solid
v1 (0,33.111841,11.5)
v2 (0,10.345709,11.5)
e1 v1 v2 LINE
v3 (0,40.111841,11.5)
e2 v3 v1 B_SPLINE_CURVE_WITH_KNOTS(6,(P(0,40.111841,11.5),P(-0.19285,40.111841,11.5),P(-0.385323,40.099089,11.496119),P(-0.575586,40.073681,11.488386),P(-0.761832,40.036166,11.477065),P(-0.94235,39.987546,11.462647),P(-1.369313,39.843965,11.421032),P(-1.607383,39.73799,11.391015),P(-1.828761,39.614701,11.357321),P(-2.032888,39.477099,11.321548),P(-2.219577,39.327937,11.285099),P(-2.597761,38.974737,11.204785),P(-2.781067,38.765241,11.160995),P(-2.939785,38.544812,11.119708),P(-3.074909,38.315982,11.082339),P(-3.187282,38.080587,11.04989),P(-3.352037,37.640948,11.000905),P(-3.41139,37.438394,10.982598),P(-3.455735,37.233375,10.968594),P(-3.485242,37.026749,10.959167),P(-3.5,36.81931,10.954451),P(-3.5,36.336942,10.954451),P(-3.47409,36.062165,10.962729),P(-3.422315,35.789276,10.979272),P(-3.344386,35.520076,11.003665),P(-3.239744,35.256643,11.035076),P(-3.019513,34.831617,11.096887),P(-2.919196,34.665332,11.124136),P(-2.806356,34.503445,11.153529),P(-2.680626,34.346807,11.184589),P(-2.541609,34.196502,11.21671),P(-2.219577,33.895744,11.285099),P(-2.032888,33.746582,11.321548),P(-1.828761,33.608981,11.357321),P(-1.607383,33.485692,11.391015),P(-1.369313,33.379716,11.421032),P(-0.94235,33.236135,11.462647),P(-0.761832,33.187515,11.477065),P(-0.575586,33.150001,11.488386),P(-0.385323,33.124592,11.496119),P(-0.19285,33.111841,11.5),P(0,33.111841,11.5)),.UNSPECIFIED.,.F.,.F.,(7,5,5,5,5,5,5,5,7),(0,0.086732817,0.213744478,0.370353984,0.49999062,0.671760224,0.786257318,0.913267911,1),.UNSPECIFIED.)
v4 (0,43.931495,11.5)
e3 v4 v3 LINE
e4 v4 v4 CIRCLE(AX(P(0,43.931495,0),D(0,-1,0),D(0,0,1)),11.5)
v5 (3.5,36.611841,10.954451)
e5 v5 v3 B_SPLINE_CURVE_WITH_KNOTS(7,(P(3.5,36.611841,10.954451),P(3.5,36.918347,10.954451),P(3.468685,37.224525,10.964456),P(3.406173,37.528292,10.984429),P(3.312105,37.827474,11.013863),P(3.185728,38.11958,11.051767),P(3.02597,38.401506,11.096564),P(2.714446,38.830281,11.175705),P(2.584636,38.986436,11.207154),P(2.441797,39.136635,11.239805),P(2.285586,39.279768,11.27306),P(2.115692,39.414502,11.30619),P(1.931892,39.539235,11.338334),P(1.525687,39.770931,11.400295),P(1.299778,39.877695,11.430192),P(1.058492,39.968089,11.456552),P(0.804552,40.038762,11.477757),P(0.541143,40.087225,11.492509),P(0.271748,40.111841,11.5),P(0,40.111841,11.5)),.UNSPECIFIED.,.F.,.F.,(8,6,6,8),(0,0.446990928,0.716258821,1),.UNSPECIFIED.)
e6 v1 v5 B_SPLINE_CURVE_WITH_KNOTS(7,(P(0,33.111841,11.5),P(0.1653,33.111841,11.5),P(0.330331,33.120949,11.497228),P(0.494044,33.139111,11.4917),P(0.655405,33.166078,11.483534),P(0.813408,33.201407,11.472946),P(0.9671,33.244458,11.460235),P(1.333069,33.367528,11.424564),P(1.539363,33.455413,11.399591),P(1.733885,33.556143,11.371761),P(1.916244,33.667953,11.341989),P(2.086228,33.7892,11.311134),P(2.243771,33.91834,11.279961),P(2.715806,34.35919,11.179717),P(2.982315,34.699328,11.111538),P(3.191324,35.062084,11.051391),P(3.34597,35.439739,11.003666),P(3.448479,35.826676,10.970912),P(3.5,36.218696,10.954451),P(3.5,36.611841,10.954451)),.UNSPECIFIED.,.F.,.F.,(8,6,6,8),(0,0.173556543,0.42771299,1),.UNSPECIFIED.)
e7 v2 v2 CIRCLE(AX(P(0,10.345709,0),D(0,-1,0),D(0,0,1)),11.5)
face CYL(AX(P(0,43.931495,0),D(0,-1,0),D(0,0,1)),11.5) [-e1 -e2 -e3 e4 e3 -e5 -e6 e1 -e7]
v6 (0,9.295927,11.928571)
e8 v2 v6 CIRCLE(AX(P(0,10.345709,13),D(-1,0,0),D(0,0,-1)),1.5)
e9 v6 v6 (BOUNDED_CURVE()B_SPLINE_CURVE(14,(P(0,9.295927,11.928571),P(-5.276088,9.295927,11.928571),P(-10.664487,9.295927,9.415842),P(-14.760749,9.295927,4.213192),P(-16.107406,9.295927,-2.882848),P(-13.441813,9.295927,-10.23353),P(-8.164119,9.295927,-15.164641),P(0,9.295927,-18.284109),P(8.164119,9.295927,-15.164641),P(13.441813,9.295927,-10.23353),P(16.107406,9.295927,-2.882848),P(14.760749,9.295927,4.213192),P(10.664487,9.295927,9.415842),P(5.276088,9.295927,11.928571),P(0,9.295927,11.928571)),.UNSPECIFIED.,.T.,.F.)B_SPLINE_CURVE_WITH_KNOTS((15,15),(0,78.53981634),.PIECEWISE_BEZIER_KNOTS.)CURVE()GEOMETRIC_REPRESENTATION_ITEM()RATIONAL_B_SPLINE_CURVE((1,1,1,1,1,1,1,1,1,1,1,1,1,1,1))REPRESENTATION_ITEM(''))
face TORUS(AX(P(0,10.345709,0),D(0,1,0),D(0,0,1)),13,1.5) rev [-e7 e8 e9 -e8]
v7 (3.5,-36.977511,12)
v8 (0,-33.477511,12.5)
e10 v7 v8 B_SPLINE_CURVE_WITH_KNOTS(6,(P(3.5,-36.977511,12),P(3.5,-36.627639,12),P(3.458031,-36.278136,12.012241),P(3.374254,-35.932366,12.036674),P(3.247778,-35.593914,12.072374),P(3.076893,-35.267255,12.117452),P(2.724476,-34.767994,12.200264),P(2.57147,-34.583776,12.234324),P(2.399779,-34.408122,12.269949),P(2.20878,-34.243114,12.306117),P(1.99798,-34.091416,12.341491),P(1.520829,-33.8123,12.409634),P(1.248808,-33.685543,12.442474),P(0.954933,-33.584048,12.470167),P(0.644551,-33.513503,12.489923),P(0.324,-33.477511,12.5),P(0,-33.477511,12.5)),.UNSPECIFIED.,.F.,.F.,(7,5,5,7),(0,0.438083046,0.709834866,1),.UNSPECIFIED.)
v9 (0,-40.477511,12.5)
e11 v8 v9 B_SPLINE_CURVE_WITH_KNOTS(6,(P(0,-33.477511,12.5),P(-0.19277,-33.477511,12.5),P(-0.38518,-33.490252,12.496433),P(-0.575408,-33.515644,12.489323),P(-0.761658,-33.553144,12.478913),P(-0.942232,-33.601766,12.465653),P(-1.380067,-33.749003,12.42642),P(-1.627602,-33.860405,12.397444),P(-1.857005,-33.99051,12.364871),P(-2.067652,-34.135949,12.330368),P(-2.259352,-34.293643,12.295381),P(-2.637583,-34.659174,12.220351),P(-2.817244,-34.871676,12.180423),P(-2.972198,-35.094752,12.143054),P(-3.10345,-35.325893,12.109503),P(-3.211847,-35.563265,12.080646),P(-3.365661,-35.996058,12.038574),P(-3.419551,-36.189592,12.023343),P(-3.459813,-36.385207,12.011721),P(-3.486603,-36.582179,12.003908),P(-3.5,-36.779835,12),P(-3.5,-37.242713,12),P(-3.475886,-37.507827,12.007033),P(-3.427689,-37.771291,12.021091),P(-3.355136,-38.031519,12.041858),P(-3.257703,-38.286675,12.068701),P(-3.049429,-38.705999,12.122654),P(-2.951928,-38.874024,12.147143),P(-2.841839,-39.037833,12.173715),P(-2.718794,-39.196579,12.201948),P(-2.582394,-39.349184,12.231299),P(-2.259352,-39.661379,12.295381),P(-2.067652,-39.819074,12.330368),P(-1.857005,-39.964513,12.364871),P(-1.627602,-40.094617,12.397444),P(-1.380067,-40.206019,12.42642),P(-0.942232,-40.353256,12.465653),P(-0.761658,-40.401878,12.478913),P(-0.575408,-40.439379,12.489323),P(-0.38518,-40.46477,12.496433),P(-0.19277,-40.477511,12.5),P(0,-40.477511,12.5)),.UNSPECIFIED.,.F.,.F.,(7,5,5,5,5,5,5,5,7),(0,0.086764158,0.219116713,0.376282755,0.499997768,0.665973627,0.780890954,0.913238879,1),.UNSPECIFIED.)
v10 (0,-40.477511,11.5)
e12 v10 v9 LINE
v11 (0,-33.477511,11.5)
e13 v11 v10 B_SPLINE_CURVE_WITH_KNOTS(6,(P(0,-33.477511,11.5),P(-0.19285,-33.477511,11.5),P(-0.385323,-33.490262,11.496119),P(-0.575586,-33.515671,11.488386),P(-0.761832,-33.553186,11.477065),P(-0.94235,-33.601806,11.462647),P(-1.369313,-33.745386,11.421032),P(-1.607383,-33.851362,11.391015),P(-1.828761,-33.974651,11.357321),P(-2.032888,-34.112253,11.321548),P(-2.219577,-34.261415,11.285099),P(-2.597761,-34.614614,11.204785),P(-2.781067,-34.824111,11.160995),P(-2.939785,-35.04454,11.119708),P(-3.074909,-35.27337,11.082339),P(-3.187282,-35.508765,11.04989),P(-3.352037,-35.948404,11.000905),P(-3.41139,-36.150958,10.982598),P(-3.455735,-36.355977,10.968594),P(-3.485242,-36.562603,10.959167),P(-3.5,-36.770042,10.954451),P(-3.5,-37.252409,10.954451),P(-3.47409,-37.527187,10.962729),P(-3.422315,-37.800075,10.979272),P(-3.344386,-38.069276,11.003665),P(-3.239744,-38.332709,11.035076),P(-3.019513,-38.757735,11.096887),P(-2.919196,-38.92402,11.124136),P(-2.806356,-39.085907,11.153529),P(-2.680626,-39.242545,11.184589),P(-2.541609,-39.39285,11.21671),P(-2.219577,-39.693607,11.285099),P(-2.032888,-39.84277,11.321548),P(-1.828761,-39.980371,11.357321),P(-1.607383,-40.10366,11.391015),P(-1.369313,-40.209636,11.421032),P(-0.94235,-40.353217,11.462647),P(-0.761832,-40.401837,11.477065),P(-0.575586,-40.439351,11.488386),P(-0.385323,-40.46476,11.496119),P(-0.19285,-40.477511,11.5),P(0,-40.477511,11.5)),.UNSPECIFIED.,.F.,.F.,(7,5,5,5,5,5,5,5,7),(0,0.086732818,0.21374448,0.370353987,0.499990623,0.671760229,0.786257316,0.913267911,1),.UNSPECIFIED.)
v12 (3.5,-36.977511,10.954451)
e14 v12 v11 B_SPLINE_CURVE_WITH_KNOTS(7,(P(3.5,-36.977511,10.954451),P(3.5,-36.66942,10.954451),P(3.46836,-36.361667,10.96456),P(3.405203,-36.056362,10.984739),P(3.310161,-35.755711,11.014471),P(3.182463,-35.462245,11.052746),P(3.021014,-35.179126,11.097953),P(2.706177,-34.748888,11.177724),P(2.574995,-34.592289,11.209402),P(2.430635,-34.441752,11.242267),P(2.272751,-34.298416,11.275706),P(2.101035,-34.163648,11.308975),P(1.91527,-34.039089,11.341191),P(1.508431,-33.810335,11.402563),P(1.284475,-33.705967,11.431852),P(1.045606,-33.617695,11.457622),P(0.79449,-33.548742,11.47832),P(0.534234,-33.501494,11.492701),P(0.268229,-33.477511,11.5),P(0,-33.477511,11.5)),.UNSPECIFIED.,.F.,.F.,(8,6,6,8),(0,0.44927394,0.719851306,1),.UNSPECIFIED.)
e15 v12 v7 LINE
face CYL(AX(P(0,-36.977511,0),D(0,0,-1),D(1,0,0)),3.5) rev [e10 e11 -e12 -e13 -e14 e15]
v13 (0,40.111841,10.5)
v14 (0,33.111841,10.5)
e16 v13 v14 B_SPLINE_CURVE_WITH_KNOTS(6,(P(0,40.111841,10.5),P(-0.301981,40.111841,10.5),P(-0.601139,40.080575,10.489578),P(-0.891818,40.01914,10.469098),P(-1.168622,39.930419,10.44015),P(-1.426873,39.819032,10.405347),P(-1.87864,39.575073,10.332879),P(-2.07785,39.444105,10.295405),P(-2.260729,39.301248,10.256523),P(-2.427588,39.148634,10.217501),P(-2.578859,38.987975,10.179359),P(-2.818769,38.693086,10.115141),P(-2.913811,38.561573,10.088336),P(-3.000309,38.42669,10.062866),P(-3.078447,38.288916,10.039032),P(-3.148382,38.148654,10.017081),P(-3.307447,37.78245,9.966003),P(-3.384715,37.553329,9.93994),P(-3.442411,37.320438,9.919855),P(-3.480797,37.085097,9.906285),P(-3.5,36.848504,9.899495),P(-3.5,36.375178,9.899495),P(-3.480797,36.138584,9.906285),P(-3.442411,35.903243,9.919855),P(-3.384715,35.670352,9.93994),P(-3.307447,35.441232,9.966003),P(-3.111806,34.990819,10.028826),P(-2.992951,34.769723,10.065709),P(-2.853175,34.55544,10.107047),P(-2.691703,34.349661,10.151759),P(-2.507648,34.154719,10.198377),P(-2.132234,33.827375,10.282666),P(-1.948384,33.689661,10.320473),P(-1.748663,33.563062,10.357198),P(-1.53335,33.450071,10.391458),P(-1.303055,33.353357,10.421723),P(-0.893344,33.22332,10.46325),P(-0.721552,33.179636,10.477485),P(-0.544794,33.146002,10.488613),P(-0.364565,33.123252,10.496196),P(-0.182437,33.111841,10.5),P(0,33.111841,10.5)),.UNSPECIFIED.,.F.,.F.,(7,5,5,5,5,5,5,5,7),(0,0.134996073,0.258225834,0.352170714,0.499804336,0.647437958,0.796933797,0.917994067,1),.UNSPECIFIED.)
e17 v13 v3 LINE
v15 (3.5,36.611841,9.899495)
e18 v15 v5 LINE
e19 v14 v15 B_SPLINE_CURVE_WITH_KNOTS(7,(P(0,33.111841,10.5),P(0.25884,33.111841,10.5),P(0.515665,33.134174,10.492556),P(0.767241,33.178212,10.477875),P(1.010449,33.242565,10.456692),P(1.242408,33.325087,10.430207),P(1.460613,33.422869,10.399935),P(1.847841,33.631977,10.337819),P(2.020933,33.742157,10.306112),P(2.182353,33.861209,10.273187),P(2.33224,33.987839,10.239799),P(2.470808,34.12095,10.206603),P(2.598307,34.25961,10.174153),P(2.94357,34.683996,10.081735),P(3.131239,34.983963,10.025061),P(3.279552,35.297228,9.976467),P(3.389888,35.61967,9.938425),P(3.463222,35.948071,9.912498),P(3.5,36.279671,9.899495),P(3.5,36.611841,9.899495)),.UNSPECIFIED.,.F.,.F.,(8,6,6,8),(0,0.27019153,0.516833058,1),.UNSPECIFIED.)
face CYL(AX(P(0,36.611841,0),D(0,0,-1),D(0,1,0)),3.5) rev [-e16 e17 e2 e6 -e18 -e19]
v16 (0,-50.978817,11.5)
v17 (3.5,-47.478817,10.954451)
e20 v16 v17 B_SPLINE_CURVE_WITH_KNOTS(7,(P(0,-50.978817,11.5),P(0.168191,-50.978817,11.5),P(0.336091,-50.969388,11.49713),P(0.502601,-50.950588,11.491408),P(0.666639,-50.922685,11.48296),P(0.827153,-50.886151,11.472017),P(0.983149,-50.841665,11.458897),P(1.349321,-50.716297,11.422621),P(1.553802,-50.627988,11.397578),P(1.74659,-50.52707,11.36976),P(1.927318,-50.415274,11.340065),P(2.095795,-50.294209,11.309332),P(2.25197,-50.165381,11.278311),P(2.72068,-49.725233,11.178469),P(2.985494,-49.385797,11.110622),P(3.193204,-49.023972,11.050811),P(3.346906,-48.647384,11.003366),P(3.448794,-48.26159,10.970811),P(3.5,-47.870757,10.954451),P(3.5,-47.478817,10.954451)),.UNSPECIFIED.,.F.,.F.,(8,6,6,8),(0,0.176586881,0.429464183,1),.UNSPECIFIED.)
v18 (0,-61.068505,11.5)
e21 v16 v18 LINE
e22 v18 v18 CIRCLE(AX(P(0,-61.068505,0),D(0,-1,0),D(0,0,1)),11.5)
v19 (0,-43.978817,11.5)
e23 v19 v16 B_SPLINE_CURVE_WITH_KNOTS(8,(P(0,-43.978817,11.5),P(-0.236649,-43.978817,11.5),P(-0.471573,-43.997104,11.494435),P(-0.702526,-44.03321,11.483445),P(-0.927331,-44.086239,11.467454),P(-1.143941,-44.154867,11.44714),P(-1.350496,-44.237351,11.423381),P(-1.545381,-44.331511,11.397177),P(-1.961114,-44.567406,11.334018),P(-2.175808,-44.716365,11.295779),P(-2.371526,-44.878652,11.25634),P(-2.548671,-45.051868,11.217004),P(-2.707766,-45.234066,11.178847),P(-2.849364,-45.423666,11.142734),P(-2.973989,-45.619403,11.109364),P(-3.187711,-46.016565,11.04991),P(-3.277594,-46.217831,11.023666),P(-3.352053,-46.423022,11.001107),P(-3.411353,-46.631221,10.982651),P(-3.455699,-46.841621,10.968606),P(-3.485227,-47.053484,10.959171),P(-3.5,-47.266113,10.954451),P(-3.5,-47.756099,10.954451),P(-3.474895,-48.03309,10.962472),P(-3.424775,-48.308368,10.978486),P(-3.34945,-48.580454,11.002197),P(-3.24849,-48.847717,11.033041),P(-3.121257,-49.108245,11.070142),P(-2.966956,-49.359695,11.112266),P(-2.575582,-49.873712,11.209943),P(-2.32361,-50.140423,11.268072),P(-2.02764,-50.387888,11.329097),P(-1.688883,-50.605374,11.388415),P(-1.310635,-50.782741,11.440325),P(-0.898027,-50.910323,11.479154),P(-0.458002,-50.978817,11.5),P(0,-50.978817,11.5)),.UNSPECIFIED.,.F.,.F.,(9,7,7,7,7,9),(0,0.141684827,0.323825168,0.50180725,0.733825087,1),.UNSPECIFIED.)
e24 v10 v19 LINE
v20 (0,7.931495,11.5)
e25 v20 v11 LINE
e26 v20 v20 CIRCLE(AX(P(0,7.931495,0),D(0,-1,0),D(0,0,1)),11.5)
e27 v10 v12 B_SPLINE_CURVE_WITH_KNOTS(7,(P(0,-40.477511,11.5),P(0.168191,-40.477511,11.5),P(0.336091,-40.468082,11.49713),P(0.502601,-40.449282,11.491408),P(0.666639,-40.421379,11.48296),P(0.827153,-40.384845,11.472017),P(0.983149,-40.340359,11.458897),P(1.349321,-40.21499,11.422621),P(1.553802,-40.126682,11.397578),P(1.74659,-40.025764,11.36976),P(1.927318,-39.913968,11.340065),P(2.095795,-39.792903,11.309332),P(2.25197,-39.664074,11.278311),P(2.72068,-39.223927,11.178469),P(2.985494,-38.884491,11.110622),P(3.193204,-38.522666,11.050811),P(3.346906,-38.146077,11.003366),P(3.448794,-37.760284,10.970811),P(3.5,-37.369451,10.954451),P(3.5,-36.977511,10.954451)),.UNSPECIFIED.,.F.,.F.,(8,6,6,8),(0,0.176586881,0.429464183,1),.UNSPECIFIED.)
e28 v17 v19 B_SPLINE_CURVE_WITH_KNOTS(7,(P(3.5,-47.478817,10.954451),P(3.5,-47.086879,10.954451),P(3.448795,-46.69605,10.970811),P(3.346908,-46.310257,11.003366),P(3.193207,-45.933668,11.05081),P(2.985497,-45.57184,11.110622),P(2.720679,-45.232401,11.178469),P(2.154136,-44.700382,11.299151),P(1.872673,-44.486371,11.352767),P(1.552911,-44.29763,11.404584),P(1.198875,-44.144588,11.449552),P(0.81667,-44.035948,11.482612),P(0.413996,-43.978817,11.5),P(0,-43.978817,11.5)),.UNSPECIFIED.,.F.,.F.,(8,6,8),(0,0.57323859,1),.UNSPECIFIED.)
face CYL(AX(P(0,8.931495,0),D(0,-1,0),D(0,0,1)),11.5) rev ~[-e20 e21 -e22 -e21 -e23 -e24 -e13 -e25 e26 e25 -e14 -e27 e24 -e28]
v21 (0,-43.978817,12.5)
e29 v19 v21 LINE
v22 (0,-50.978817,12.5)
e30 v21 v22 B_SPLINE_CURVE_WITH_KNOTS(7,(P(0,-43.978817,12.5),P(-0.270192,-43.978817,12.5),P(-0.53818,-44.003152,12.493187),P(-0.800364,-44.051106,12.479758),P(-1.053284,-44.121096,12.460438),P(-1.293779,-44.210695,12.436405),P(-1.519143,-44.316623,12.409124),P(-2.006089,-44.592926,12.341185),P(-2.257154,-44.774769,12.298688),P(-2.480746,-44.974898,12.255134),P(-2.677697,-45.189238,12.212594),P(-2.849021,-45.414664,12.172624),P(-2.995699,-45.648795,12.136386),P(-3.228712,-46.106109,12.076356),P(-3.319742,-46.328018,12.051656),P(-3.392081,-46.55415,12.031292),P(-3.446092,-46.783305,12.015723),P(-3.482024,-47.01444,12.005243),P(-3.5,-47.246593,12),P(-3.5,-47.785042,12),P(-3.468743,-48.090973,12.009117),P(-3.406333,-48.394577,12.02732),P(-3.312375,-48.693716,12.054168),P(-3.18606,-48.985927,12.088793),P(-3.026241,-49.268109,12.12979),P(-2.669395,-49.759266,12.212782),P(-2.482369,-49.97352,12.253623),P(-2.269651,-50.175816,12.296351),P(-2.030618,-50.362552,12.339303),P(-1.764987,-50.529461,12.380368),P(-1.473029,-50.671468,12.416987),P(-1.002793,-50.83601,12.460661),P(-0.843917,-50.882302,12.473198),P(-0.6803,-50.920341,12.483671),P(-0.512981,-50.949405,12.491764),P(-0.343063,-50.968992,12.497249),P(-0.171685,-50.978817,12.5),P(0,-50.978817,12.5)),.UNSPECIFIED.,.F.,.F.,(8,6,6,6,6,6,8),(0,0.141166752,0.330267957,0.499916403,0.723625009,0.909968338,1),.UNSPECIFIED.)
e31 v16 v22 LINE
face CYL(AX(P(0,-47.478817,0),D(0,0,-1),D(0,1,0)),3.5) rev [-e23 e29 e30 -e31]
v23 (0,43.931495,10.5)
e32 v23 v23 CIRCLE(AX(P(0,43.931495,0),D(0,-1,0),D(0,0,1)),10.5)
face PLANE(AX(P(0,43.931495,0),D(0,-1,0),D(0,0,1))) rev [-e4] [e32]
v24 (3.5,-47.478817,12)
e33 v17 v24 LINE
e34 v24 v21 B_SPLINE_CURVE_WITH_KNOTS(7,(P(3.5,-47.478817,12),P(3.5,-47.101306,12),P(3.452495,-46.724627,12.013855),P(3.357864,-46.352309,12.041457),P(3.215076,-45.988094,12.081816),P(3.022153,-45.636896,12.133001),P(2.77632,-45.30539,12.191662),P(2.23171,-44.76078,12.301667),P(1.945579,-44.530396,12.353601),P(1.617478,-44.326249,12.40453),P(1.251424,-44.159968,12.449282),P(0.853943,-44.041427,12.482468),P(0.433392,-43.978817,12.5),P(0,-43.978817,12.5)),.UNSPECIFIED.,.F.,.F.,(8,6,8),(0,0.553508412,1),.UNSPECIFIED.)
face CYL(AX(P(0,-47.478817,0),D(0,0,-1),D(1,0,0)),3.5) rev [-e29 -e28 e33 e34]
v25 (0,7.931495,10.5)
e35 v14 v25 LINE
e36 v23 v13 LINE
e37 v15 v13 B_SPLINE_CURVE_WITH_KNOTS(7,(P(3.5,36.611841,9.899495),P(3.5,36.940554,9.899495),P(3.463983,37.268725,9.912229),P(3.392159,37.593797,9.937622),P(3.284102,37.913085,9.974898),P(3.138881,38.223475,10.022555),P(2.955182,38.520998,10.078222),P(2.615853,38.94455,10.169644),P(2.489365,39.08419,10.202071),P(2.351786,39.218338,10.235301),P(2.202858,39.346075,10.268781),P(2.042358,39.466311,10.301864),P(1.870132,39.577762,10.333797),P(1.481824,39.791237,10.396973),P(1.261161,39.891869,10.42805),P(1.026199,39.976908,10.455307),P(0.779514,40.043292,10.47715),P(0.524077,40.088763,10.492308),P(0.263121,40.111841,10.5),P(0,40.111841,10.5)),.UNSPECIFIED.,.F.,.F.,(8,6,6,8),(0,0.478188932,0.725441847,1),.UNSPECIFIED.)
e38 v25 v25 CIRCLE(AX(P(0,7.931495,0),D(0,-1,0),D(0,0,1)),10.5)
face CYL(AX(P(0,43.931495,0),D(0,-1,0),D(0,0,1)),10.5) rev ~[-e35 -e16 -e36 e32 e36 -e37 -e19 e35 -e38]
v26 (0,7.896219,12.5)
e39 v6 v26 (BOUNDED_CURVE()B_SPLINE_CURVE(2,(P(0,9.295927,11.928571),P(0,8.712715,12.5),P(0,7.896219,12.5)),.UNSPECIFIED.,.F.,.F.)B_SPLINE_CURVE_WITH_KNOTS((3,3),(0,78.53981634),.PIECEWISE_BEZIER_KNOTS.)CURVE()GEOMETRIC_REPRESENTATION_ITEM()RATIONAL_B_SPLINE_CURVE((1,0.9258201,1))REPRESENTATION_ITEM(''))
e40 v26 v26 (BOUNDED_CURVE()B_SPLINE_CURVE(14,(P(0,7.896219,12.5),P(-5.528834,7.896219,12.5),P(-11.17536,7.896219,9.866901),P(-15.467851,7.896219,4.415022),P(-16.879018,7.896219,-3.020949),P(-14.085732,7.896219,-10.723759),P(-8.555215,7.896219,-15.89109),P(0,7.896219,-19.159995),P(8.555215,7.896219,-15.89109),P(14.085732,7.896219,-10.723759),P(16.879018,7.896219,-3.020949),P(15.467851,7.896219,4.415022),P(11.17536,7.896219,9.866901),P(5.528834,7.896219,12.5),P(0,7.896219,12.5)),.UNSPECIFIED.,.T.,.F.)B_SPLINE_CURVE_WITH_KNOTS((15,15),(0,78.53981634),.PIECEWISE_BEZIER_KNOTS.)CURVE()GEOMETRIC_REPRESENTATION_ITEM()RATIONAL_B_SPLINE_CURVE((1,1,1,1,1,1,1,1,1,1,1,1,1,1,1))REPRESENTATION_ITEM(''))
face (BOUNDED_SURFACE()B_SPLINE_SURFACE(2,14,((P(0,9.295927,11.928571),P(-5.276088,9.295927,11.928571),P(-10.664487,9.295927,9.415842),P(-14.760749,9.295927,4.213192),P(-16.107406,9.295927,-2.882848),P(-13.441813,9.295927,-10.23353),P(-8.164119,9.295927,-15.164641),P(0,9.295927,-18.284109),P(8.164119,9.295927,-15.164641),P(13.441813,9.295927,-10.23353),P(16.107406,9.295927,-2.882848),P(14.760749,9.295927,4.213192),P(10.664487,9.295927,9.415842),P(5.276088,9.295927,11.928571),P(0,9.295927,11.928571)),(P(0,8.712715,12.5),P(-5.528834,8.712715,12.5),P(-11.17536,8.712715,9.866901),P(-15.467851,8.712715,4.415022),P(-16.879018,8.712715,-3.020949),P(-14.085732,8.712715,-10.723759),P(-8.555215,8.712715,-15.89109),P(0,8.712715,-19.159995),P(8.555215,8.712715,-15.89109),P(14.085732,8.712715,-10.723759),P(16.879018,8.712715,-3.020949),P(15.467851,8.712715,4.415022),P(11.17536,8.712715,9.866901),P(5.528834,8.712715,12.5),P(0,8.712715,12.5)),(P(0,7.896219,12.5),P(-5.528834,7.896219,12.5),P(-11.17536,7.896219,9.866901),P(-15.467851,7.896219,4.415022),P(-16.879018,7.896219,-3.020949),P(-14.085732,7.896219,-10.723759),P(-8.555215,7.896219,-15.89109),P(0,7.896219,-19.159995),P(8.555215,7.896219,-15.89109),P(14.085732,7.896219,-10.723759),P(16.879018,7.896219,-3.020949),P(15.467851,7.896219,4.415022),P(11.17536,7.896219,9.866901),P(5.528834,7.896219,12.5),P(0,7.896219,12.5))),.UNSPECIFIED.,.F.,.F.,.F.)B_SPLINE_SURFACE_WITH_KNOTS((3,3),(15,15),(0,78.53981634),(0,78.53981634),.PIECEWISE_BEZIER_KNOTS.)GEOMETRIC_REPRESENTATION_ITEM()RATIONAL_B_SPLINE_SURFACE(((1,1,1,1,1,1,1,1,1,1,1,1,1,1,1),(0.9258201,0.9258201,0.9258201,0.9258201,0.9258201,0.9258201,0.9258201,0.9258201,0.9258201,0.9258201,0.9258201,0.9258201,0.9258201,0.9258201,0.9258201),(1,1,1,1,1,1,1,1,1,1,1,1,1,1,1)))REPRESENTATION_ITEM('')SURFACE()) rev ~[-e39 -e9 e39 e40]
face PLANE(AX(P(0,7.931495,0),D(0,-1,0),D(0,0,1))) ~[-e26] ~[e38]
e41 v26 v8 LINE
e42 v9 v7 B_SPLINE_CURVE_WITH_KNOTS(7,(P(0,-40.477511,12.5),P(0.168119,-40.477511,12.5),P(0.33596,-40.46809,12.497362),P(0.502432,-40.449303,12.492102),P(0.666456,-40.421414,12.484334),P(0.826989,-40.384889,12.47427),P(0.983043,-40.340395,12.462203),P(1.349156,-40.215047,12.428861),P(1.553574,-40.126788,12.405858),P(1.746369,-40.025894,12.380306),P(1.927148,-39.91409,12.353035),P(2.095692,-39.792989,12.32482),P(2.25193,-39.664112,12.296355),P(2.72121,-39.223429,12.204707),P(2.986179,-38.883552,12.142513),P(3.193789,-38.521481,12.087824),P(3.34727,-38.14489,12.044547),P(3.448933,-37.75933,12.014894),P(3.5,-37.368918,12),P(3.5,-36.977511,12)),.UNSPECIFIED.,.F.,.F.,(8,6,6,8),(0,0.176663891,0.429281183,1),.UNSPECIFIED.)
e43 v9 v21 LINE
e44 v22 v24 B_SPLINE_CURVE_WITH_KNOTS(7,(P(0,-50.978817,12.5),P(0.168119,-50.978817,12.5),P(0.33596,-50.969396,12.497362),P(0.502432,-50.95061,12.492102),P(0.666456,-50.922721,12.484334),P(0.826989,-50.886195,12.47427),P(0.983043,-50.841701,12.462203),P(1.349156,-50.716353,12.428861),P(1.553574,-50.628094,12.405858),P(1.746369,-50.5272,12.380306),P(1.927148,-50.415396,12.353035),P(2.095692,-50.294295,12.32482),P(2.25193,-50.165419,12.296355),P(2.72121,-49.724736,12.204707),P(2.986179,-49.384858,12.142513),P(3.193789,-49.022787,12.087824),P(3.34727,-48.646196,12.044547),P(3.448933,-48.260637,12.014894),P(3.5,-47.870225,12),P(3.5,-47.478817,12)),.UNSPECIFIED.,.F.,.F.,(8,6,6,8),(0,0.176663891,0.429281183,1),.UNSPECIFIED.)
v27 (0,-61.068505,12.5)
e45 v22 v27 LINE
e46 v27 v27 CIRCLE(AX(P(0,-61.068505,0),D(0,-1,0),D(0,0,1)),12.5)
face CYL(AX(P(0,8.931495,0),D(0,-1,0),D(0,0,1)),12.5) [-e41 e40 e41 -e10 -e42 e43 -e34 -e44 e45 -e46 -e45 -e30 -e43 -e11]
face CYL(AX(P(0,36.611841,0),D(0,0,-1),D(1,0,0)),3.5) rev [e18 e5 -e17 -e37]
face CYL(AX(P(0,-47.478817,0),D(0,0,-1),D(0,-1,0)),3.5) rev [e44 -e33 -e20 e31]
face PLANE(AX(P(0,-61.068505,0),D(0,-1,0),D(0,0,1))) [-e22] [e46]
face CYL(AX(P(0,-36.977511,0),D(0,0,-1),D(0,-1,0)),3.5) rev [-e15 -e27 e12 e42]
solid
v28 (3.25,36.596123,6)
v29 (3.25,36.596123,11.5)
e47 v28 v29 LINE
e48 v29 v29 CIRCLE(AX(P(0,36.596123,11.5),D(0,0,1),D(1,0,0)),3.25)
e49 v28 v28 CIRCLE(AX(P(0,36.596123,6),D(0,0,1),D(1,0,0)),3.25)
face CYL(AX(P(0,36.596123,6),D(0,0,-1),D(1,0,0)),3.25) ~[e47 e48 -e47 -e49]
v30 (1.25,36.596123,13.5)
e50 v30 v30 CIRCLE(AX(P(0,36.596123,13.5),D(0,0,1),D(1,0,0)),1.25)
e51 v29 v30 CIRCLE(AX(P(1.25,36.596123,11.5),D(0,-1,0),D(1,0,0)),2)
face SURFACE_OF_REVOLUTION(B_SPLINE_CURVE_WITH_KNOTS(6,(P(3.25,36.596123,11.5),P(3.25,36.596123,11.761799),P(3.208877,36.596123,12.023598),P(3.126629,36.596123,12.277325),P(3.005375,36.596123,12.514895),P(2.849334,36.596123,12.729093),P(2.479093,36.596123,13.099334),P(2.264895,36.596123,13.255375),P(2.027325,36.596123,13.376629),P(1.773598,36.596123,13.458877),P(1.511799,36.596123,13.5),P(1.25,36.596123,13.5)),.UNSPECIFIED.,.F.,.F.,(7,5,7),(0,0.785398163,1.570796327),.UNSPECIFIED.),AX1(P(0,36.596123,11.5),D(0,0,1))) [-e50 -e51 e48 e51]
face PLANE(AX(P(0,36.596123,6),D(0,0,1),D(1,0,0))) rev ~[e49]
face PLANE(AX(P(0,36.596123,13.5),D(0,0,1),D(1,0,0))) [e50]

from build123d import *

# Parameters (mm, degrees)
F2_T     = -1
F4_R     = 2
F6_DEPTH = 15
F8_R     = 3.25
F9_DEPTH = 7.5
F10_R    = 2


# Not quite as in the source:
# - a fillet or chamfer that OpenCascade refuses, or shapes differently, is made with other operations: its cross-section is extruded or revolved along the edge and cut away or added
# - a feature names something its author has since deleted; it is built from what else it names


with BuildPart() as f1:
    # F0 (on Right) → F1 (revolve)
    with BuildSketch(Plane.YZ):
        Polygon((-61.0685050488, 12.5), (-61.0685050488, 0), (43.9314949512, 0), (43.9314949512, 11.5), (8.9314949512, 11.5), (8.9314949512, 12.5), align=None)
    revolve(axis=Axis((0, -8.5685050488, 0), (0, -1, 0)))

    # F2
    f2_openings = [f1.faces().sort_by_distance(p)[0] for p in [
        (0, -61.068505, 0),
        (0, 43.931495, 0),
    ]]
    offset(amount=F2_T, openings=f2_openings, kind=Kind.INTERSECTION)

    # F3: fillet of radius 1.5 on 1 edges, made by hand

    # F3_s1 → F3_t2 (revolve)
    with BuildSketch(Plane.YZ):
        with BuildLine():
            ThreePointArc((10.3457085136, 11.5), (9.4796831098, 11.7752551286), (8.9314949512, 12.5))
            Line((8.9314949512, 12.5), (8.9314949512, 11.5))
            Line((8.9314949512, 11.5), (10.3457085136, 11.5))
        make_face()
    revolve(axis=Axis((0, 8.9314949512, 0), (0, -1, 0)))

    # F4
    f4_edges = [f1.edges().sort_by_distance(p)[0] for p in [
        (0, 8.931495, -12.5),
    ]]
    fillet(f4_edges, radius=F4_R)

    # F5 (on Top) → F6 (cut)
    with BuildSketch(Plane.XY):
        with BuildLine():
            ThreePointArc((3.5, -36.9775111079), (-2.4748737342, -34.5026373738), (0, -40.4775111079))
            ThreePointArc((0, -40.4775111079), (2.4748737342, -39.4523848421), (3.5, -36.9775111079))
        make_face()
        with BuildLine():
            ThreePointArc((3.25, -36.9775111079), (2.2980970389, -39.2756081468), (0, -40.2275111079))
            ThreePointArc((0, -40.2275111079), (-2.2980970389, -34.6794140691), (3.25, -36.9775111079))
        make_face(mode=Mode.SUBTRACT)
        with BuildLine():
            ThreePointArc((3.5, 36.6118407249), (2.4748737342, 39.0867144591), (0, 40.1118407249))
            ThreePointArc((0, 40.1118407249), (-2.4748737342, 34.1369669908), (3.5, 36.6118407249))
        make_face()
        with BuildLine():
            ThreePointArc((3.25, 36.6118407249), (-2.2980970389, 34.3137436861), (0, 39.8618407249))
            ThreePointArc((0, 39.8618407249), (2.2980970389, 38.9099377638), (3.25, 36.6118407249))
        make_face(mode=Mode.SUBTRACT)
        with BuildLine():
            ThreePointArc((3.25, 36.6118407249), (2.2980970389, 38.9099377638), (0, 39.8618407249))
            ThreePointArc((0, 39.8618407249), (-2.2980970389, 34.3137436861), (3.25, 36.6118407249))
        make_face()
        with BuildLine():
            ThreePointArc((3.25, -36.9775111079), (-2.2980970389, -34.6794140691), (0, -40.2275111079))
            ThreePointArc((0, -40.2275111079), (2.2980970389, -39.2756081468), (3.25, -36.9775111079))
        make_face()
        with BuildLine():
            Line((0, -43.9788174033), (0, -50.9788174033))
            ThreePointArc((0, -50.9788174033), (2.4748737342, -49.9536911375), (3.5, -47.4788174033))
            ThreePointArc((3.5, -47.4788174033), (2.4748737342, -45.0039436692), (0, -43.9788174033))
        make_face()
        with BuildLine():
            ThreePointArc((0, -43.9788174033), (-3.5, -47.4788174033), (0, -50.9788174033))
            Line((0, -50.9788174033), (0, -43.9788174033))
        make_face()
    extrude(amount=F6_DEPTH, mode=Mode.SUBTRACT)


with BuildPart() as f9:
    # F8 (on offset) → F9 (new body)
    with BuildSketch(Plane.XY.offset(6)):
        with Locations((0, 36.5961231291)):
            Circle(F8_R)
    extrude(amount=F9_DEPTH)

    # F10
    f10_edges = [f9.edges().sort_by_distance(p)[0] for p in [
        (-3.25, 36.596123, 13.5),
    ]]
    fillet(f10_edges, radius=F10_R)


solid = Compound([f1.part, f9.part])
